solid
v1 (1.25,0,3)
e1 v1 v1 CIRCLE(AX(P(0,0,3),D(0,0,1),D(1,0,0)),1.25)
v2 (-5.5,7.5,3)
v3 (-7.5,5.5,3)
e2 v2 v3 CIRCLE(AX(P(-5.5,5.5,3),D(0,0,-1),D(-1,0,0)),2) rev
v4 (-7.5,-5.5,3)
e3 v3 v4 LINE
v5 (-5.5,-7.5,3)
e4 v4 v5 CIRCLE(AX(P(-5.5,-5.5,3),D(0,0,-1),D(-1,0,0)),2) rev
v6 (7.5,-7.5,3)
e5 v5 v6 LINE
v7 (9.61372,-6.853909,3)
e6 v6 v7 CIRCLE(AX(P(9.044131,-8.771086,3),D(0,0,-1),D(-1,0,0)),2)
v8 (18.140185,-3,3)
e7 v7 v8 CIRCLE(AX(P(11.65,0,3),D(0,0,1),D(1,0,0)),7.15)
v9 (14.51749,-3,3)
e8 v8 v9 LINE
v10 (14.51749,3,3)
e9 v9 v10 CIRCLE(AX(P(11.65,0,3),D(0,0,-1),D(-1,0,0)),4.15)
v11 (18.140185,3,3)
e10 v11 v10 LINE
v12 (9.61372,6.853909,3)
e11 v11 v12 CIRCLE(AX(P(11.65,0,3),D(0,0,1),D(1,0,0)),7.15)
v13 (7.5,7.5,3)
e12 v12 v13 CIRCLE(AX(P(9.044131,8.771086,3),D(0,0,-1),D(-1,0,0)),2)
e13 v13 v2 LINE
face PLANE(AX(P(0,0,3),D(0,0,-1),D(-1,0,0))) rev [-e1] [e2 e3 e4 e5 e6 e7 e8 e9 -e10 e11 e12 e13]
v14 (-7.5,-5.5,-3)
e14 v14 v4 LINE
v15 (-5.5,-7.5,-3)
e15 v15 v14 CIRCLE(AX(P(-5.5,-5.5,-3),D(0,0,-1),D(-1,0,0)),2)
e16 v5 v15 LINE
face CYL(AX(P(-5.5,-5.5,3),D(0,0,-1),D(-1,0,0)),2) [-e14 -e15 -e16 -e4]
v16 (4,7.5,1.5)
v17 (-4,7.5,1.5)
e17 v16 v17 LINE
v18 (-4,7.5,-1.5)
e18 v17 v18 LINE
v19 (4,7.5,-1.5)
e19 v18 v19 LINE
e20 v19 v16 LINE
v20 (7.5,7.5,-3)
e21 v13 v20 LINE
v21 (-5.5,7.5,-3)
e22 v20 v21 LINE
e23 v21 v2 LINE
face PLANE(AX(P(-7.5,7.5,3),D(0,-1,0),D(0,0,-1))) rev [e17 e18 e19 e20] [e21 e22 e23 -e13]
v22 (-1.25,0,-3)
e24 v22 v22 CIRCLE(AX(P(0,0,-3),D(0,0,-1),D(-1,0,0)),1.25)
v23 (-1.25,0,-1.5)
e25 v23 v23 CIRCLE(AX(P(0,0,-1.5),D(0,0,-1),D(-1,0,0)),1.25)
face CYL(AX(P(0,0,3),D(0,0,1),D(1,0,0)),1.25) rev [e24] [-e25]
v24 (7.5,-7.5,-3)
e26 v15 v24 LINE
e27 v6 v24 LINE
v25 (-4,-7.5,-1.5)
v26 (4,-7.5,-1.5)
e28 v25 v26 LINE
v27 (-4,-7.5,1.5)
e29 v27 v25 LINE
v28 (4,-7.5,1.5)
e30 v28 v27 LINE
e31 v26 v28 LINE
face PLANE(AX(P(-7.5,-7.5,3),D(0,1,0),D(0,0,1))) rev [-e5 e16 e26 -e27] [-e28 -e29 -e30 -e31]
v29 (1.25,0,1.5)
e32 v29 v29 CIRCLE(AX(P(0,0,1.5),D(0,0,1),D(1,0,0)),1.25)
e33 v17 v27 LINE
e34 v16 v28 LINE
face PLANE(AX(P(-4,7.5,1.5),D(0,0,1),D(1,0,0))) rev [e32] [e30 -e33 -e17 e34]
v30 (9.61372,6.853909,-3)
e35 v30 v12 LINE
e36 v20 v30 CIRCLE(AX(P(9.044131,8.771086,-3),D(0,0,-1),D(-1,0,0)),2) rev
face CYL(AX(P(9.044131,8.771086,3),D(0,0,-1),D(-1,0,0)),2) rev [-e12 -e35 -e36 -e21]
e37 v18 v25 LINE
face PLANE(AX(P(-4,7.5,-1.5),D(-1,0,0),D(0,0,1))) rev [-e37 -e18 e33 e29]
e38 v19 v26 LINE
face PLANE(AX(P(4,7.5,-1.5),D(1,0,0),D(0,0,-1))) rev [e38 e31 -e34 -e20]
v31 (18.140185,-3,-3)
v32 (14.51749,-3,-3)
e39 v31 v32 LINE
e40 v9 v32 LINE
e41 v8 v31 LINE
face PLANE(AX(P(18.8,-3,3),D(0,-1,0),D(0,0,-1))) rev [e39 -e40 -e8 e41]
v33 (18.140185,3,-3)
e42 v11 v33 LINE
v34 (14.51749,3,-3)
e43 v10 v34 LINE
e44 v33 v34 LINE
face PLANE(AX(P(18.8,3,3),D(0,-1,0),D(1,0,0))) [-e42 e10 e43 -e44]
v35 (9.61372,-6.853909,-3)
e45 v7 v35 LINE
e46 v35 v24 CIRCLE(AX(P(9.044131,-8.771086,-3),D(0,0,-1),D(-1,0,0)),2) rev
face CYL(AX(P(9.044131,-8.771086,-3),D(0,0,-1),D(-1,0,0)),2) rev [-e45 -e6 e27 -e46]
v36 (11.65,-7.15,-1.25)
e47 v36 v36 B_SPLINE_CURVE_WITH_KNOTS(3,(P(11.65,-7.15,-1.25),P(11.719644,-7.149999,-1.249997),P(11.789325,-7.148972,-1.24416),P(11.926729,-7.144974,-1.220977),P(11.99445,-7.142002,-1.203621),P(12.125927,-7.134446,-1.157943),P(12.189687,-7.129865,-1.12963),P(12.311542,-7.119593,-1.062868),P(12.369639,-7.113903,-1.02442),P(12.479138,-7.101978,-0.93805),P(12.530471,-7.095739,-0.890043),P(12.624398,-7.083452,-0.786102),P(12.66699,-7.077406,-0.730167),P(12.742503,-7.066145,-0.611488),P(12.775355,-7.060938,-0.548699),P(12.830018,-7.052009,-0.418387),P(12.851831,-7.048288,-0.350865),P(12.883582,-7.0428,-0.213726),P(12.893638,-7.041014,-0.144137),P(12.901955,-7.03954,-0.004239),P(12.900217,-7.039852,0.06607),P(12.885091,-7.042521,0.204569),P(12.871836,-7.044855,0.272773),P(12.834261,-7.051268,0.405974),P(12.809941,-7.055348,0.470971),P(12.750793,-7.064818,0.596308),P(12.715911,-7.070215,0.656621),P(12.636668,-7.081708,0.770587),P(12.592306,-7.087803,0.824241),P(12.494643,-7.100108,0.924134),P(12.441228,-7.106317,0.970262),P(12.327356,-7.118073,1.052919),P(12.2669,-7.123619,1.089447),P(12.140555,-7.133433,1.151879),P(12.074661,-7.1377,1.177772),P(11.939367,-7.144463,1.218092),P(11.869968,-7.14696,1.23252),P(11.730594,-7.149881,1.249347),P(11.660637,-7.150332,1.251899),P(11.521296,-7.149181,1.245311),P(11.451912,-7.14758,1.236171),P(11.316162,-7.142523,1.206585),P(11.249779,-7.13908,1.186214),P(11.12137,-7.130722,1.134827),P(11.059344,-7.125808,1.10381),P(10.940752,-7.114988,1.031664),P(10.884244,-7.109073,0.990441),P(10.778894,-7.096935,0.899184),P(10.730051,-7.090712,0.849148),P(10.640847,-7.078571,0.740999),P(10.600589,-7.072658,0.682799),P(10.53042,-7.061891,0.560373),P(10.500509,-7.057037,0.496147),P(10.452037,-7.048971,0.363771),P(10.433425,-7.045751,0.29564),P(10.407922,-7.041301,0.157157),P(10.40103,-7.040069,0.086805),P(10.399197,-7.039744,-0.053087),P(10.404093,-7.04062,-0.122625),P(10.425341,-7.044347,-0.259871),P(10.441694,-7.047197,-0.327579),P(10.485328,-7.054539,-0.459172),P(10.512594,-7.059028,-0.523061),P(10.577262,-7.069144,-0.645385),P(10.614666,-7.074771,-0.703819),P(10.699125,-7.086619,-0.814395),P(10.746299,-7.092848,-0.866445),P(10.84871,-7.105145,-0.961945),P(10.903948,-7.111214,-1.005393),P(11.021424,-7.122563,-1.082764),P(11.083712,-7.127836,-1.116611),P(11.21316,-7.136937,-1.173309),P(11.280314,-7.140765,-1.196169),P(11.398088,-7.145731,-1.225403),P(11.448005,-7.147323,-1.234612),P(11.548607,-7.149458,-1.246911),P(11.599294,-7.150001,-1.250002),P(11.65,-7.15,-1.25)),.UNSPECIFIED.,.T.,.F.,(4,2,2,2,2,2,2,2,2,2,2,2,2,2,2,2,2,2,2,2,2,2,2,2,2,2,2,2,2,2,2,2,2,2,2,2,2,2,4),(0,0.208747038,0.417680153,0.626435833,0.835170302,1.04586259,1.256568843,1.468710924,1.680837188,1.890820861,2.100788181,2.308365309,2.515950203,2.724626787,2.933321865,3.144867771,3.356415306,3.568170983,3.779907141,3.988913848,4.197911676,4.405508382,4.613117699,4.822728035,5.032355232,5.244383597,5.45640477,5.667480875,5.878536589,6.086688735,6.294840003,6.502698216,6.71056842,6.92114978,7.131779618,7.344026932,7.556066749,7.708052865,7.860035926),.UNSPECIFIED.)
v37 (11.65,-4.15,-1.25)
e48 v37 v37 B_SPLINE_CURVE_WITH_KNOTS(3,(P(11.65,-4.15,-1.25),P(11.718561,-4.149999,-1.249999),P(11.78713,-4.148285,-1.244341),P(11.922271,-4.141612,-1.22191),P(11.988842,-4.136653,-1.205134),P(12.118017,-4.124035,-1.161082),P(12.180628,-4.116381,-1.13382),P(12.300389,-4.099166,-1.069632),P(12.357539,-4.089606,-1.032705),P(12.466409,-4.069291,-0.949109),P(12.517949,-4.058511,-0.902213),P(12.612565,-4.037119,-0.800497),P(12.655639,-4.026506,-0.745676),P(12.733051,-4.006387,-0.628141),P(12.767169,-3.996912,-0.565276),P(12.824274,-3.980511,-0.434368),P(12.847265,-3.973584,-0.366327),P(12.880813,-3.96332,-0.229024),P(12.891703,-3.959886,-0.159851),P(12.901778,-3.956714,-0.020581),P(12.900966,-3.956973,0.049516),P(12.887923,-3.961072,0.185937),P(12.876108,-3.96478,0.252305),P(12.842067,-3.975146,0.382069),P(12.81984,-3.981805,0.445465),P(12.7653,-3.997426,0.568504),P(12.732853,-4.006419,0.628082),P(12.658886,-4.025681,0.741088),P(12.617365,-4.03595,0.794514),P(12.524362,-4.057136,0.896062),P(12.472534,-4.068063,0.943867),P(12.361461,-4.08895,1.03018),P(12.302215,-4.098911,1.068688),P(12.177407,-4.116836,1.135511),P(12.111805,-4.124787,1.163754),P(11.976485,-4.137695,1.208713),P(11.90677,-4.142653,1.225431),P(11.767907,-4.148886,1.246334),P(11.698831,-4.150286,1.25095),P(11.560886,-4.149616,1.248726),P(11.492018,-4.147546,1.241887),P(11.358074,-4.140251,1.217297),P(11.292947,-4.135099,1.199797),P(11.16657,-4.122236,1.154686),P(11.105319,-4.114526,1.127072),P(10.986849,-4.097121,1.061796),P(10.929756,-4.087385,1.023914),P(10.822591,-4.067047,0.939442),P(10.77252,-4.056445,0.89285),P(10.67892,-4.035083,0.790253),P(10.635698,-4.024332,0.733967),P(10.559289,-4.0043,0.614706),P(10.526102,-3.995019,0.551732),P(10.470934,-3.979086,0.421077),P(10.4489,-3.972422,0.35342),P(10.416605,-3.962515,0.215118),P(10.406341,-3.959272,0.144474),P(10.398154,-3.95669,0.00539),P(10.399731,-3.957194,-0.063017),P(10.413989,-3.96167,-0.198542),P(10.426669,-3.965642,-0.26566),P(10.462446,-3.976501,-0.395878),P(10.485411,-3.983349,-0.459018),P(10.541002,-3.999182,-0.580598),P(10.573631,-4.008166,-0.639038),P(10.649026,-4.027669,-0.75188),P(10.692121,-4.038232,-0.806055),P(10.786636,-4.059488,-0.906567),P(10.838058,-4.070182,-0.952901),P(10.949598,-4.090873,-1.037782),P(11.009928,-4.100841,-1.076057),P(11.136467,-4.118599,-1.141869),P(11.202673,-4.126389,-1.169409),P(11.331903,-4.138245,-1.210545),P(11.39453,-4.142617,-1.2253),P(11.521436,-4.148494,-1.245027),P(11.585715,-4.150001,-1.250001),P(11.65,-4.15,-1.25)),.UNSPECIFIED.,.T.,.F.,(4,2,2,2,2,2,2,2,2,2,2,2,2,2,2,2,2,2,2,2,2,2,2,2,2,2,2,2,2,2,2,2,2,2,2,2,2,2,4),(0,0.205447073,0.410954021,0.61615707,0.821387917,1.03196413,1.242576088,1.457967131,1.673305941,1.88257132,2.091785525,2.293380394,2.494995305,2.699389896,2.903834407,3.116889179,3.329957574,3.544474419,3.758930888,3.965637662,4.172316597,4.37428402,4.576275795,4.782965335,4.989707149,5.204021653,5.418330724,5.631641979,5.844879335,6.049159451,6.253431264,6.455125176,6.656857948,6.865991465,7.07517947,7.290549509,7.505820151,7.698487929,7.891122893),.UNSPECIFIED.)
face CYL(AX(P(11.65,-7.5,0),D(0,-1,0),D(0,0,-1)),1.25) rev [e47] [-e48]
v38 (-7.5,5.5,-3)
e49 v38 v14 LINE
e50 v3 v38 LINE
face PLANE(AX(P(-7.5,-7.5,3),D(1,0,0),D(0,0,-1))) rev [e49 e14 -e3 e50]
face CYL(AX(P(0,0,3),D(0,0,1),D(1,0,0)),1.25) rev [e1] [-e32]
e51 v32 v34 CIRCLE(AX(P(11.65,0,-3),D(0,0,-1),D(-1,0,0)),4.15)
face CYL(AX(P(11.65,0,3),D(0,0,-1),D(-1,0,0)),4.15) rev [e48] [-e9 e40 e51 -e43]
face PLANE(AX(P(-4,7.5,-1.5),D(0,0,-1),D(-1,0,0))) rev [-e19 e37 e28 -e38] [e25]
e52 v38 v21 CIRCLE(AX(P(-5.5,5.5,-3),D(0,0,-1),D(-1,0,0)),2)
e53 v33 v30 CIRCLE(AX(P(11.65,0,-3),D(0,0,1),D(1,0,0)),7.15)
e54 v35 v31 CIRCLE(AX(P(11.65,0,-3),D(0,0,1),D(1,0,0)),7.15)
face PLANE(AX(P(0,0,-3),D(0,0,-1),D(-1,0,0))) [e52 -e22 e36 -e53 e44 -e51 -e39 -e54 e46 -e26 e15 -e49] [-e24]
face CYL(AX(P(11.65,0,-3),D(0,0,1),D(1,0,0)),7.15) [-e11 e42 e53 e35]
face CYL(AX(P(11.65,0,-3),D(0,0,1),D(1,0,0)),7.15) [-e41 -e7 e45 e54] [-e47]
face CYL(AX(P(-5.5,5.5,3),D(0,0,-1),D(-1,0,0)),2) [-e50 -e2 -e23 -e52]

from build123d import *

# Parameters (mm, degrees)
SKETCH1_W                 = 15
SKETCH1_H                 = 15
BOSS_EXTRUDE1_DEPTH       = 3
SKETCH2_W                 = 8
SKETCH2_H                 = 3
CUT_EXTRUDE1_DEPTH        = 18.036725037
BOSS_EXTRUDE2_DEPTH       = 6
FILLET1_R                 = 2
CUT_EXTRUDE2_DEPTH        = 22.111371343
M3X0_5_TAPPED_HOLE1_D     = 2.5
M3X0_5_TAPPED_HOLE1_DEPTH = 7.5
M3X0_5_TAPPED_HOLE1_TIP   = 0.751075774
M3X0_5_TAPPED_HOLE2_D     = 2.5
M3X0_5_TAPPED_HOLE2_DEPTH = 7.5
M3X0_5_TAPPED_HOLE2_TIP   = 0.751075774


with BuildPart() as part:
    # Sketch1 → Boss-Extrude1 (new, symmetric)
    with BuildSketch(Plane.XY):
        Rectangle(SKETCH1_W, SKETCH1_H)
    extrude(amount=BOSS_EXTRUDE1_DEPTH, both=True)

    # Sketch2 → Cut-Extrude1 (cut, through all)
    with BuildSketch(Plane.XZ.offset(7.5)):
        Rectangle(SKETCH2_W, SKETCH2_H)
    extrude(amount=-CUT_EXTRUDE1_DEPTH, mode=Mode.SUBTRACT)

    # Sketch3 → Boss-Extrude2 (add)
    with BuildSketch(Plane.XY.offset(3)):
        with BuildLine():
            Line((7.5, -5.822370651), (7.5, 5.822370651))
            ThreePointArc((7.5, 5.822370651), (18.8, 0), (7.5, -5.822370651))
        make_face()
    extrude(amount=-BOSS_EXTRUDE2_DEPTH)

    # Fillet1
    # the kernel refuses this fillet: 2 mm, written as the material it adds along each edge
    with BuildSketch(Plane(origin=(7.5, -5.822370651, 3), x_dir=(0, -1, 0), z_dir=(0, 0, -1))) as fillet1_piece_1:
        with BuildLine():
            CenterArc((2.948715205, -1.544131065), FILLET1_R, 129.460264065, 67.086296359)
            ThreePointArc((1.031537969, -2.113719903), (0.603278499, -1.014153543), (0, 0))
            Line((0, 0), (1.677629349, 0))
        make_face()
    extrude(amount=6)
    with BuildSketch(Plane(origin=(7.5, 5.822370651, 3), x_dir=(0, 1, 0), z_dir=(0, 0, -1))) as fillet1_piece_2:
        with BuildLine():
            CenterArc((2.948715205, 1.544131065), FILLET1_R, 163.453439576, 67.086296359)
            ThreePointArc((1.031537969, 2.113719903), (0.603278499, 1.014153543), (0, 0))
            Line((0, 0), (1.677629349, 0))
        make_face()
    extrude(amount=6)
    # the kernel refuses this fillet: 2 mm, written as the material it takes off along each edge
    with BuildSketch(Plane(origin=(-7.5, -7.5, 8), x_dir=(1, 0, 0), z_dir=(0, 0, -1)), Plane(origin=(-7.5, 7.5, 8), x_dir=(0, -1, 0), z_dir=(0, 0, -1))) as fillet1_2_piece_1:
        with BuildLine():
            CenterArc((FILLET1_R, -FILLET1_R), FILLET1_R, 90, 90)
            Line((0, -FILLET1_R), (0, 0))
            Line((0, 0), (FILLET1_R, 0))
        make_face()
    extrude(amount=16, mode=Mode.SUBTRACT)

    # Sketch4 → Cut-Extrude2 (cut, through all)
    with BuildSketch(Plane(origin=(0, 0, -3), x_dir=(-1, 0, 0), z_dir=(0, 0, -1))):
        with BuildLine():
            Line((-18.8, 3), (-14.517490192, 3))
            ThreePointArc((-14.517490192, 3), (-7.5, 0), (-14.517490192, -3))
            Line((-14.517490192, -3), (-18.8, -3))
            Line((-18.8, -3), (-18.8, 3))
        make_face()
    extrude(amount=-CUT_EXTRUDE2_DEPTH, mode=Mode.SUBTRACT)

    # M3x0.5 Tapped Hole1
    with Locations(Plane(origin=(0, -7.5, 0), x_dir=(-1, 0, 0), z_dir=(0, -1, 0))):
        with Locations((-11.65, 0)):
            Hole(M3X0_5_TAPPED_HOLE1_D / 2, depth=M3X0_5_TAPPED_HOLE1_DEPTH)
            with Locations((0, 0, -(M3X0_5_TAPPED_HOLE1_DEPTH + M3X0_5_TAPPED_HOLE1_TIP / 2))):  # 118° drill point
                Cone(0, M3X0_5_TAPPED_HOLE1_D / 2, M3X0_5_TAPPED_HOLE1_TIP, mode=Mode.SUBTRACT)

    # M3x0.5 Tapped Hole2
    with Locations(Plane.XY.offset(3)):
        with Locations((0, 0)):
            Hole(M3X0_5_TAPPED_HOLE2_D / 2, depth=M3X0_5_TAPPED_HOLE2_DEPTH)
            with Locations((0, 0, -(M3X0_5_TAPPED_HOLE2_DEPTH + M3X0_5_TAPPED_HOLE2_TIP / 2))):  # 118° drill point
                Cone(0, M3X0_5_TAPPED_HOLE2_D / 2, M3X0_5_TAPPED_HOLE2_TIP, mode=Mode.SUBTRACT)


solid = part.part
